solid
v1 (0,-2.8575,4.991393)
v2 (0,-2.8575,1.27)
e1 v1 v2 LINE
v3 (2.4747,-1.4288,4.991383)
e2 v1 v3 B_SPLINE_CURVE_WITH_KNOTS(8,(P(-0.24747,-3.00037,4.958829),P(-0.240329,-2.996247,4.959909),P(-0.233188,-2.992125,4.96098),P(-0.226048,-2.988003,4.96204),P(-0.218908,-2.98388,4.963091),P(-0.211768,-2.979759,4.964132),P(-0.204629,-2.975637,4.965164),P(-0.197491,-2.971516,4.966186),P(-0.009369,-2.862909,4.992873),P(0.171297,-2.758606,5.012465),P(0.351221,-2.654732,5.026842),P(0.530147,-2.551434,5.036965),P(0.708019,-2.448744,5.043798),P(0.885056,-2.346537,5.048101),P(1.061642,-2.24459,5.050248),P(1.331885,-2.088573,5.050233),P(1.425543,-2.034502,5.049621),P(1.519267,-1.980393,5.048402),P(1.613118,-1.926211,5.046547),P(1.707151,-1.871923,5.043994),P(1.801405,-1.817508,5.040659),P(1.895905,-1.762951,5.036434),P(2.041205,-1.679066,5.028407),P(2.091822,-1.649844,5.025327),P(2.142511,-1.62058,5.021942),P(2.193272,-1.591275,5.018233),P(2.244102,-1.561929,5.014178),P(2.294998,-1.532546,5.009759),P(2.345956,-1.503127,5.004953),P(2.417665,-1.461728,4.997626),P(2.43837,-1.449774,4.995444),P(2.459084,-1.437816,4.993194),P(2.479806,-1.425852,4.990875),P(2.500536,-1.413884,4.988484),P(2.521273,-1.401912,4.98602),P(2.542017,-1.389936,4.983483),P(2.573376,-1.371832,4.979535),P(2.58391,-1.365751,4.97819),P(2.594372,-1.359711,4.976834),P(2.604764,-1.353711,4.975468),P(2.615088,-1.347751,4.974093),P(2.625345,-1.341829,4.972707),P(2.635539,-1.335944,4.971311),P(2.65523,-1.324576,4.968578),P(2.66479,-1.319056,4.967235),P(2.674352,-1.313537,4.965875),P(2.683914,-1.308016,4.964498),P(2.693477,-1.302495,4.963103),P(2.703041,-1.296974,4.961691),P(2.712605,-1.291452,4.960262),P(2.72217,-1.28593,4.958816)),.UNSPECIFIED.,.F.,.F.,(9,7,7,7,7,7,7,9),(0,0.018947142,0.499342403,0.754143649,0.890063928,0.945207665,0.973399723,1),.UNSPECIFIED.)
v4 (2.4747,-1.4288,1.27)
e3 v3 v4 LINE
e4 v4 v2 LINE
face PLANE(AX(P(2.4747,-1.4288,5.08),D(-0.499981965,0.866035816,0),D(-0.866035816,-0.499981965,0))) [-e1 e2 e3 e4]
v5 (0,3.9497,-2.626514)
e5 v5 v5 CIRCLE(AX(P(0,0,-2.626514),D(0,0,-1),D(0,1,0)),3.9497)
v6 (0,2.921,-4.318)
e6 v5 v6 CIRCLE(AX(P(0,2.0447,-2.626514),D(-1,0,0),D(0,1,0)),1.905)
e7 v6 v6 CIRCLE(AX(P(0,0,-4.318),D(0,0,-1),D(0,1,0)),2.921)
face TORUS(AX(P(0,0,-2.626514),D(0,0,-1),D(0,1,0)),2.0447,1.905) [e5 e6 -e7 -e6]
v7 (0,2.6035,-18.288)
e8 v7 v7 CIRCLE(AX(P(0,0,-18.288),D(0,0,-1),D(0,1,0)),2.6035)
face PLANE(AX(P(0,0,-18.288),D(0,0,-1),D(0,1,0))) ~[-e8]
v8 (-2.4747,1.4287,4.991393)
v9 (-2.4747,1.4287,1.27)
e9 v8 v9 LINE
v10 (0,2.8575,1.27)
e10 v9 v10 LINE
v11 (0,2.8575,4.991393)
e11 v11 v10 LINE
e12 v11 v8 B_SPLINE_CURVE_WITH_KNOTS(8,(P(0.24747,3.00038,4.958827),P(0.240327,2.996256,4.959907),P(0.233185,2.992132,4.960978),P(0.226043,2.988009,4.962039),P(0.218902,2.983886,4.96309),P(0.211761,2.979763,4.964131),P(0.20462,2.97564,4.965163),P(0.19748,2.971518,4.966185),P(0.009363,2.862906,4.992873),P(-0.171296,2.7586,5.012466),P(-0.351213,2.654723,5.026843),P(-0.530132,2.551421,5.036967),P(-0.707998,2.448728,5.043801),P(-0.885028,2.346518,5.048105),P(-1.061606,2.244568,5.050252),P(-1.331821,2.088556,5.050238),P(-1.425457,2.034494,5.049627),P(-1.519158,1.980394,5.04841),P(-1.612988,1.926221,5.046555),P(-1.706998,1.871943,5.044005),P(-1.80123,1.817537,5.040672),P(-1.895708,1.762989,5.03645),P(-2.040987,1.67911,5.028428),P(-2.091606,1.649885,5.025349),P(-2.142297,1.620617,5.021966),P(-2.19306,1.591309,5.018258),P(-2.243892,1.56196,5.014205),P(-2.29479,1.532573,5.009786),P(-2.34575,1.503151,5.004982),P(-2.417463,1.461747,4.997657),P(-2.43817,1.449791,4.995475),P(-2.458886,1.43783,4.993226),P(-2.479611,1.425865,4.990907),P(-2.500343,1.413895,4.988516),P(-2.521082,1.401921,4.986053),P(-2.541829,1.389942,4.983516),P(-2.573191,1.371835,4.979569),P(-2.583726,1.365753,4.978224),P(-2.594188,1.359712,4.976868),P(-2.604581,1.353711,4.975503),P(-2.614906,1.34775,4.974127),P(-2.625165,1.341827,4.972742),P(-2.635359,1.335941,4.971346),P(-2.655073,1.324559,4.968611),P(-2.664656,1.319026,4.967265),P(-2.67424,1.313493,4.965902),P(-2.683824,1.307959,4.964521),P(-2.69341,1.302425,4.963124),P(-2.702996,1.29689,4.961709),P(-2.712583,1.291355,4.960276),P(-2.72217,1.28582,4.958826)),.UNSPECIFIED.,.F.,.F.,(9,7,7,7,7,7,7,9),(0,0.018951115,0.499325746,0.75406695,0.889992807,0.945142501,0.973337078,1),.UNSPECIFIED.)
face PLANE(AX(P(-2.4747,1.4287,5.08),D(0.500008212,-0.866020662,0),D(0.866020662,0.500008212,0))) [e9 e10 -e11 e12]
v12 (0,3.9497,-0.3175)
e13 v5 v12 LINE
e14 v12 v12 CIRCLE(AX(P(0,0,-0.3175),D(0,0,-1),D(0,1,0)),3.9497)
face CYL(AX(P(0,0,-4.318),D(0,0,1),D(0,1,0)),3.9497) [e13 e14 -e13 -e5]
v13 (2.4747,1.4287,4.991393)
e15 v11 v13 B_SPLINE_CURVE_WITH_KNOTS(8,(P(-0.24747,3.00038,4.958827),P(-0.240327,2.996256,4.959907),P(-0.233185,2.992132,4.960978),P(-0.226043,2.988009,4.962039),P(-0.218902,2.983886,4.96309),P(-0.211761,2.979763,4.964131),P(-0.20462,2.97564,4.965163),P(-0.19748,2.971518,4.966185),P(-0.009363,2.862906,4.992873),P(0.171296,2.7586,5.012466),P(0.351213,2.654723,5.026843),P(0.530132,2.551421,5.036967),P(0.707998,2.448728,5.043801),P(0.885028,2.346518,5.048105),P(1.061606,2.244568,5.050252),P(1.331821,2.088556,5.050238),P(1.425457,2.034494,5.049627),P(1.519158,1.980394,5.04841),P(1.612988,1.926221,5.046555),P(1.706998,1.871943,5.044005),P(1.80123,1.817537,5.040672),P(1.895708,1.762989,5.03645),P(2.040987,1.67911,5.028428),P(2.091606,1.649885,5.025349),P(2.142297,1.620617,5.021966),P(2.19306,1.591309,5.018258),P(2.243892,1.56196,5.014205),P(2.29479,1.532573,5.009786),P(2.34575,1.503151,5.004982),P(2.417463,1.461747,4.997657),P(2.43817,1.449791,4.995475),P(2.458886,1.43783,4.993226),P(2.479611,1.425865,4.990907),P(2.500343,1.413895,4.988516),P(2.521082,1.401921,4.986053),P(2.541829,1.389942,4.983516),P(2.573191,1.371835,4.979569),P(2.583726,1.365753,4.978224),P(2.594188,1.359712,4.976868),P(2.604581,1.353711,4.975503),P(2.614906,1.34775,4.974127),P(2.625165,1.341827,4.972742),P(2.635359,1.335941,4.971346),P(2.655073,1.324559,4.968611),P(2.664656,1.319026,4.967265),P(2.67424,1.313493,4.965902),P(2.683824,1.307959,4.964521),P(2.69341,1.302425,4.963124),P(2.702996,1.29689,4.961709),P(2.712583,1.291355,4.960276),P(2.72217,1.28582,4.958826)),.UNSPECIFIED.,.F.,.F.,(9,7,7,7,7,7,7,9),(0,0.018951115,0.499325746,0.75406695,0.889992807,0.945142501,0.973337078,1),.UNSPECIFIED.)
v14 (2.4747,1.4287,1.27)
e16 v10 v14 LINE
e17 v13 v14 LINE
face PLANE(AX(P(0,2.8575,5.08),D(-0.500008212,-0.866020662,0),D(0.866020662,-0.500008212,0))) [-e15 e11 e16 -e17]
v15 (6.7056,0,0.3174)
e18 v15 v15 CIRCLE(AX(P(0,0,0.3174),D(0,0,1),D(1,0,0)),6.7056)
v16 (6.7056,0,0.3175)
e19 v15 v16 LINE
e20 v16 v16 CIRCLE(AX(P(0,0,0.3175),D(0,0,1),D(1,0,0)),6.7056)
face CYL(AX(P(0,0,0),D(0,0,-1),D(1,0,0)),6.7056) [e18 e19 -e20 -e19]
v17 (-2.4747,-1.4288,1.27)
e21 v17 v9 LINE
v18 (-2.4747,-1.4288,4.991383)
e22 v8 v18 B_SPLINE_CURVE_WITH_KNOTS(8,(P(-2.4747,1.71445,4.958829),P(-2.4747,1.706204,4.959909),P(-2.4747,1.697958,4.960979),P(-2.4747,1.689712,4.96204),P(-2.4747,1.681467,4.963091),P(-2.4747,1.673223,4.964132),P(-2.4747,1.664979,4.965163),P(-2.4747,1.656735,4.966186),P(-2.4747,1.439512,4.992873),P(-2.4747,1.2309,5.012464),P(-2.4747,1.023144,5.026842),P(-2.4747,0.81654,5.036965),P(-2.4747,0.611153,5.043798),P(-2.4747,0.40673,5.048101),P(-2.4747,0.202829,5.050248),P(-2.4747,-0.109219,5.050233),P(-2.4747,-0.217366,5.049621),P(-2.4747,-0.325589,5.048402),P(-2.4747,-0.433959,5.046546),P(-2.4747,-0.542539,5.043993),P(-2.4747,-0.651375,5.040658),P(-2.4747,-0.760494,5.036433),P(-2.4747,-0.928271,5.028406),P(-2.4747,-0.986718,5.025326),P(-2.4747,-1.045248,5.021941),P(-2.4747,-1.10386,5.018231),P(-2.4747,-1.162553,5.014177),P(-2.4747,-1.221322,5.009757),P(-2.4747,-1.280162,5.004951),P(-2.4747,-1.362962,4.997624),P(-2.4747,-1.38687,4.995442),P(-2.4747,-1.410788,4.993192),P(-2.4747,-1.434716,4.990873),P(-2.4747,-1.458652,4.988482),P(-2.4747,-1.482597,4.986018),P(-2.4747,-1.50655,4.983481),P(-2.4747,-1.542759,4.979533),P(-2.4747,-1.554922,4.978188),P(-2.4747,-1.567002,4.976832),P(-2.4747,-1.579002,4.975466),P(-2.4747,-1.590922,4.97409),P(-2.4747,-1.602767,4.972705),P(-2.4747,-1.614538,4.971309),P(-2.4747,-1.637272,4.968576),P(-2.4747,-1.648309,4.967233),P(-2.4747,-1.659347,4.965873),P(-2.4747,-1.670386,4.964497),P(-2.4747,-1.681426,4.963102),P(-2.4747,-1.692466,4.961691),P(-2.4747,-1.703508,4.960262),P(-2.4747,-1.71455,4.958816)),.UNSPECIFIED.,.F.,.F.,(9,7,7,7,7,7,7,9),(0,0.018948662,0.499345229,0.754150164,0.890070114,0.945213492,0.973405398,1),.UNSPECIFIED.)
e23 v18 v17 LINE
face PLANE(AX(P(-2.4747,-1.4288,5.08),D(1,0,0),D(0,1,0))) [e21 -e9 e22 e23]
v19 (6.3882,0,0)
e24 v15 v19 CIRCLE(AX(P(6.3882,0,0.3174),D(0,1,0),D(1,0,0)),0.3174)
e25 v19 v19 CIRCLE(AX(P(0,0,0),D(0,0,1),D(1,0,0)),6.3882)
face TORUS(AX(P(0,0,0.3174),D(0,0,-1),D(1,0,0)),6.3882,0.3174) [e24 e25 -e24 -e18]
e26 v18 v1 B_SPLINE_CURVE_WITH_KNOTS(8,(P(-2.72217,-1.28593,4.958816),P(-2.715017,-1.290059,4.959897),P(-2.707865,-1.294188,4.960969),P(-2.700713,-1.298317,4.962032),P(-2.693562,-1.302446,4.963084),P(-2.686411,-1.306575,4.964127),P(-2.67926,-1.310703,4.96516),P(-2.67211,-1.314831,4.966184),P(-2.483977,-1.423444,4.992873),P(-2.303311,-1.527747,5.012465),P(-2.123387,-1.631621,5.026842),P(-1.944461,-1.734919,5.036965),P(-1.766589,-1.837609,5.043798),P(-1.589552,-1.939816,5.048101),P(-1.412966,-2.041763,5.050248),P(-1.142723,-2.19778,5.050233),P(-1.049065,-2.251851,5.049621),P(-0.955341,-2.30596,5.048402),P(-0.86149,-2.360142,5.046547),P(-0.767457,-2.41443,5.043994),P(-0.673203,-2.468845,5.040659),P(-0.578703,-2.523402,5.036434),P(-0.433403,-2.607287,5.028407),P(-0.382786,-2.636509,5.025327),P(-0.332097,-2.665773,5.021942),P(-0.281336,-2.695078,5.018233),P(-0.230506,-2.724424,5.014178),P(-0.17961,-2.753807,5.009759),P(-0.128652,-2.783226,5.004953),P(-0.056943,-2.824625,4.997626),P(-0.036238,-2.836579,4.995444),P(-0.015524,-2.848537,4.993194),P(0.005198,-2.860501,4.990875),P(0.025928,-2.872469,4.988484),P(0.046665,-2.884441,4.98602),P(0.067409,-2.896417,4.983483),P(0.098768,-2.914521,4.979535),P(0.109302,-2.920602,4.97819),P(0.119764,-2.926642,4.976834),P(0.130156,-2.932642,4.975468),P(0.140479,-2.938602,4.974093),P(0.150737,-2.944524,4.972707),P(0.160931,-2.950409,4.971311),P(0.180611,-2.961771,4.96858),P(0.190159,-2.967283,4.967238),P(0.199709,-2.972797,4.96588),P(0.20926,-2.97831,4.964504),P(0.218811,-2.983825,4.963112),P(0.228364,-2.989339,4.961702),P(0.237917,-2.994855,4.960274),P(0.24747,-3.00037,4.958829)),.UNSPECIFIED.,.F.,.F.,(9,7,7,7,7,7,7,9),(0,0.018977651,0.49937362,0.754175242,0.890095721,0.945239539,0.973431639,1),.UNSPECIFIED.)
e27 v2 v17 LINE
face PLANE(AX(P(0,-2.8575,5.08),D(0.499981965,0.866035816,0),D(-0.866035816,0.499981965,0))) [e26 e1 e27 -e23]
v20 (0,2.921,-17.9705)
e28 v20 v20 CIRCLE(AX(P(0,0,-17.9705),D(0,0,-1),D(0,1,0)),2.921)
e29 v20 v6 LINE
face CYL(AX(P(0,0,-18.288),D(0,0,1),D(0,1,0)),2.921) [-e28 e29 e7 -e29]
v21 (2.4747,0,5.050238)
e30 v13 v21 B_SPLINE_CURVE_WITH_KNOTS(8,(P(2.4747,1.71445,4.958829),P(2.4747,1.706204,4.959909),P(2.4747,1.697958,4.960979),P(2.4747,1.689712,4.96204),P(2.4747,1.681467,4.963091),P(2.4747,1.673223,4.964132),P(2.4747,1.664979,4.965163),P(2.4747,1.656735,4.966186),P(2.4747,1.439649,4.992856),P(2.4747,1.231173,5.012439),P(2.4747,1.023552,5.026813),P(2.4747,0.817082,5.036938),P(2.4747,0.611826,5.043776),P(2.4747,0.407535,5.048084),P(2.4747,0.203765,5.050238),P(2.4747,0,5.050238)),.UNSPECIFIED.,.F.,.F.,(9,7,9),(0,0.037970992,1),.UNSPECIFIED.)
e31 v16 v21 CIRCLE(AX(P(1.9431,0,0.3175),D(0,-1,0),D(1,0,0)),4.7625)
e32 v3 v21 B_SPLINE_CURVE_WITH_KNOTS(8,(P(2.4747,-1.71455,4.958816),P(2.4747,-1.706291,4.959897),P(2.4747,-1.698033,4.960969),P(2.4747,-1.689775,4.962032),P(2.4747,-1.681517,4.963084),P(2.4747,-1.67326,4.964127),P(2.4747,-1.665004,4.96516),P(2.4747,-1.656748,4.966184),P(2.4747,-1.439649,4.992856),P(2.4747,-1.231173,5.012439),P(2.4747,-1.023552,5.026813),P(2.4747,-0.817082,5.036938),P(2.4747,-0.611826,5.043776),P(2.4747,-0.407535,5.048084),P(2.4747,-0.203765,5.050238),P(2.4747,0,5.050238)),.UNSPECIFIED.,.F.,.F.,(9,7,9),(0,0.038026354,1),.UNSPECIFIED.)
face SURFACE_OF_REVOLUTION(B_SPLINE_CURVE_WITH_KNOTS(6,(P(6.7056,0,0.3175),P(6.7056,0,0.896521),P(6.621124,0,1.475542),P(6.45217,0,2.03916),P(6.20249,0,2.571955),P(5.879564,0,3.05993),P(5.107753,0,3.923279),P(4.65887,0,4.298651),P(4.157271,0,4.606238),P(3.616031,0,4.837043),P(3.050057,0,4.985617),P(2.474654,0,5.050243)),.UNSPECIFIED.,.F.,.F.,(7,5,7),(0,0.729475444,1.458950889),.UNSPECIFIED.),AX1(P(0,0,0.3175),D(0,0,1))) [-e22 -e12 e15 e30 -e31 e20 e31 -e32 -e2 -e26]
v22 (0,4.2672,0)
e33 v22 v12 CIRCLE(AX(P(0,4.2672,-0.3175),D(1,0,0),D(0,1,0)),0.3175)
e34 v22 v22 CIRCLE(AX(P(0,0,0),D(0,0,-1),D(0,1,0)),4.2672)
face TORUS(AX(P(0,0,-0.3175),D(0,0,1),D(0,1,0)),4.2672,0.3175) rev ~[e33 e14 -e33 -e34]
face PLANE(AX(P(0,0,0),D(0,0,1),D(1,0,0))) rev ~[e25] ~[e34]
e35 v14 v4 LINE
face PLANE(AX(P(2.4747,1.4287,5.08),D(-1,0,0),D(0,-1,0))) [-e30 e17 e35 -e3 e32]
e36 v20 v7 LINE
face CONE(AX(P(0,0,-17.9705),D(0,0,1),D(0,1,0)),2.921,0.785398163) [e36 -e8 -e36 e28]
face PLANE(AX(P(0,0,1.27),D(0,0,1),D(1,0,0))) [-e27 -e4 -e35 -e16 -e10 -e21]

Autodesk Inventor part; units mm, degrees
ref_plane "YZ Plane" through (0, 0, 0) normal (1, 0, 0) x (0, 1, 0)
ref_plane "XZ Plane" through (0, 0, 0) normal (0, 1, 0) x (-1, 0, 0)
ref_plane "XY Plane" through (0, 0, 0) normal (0, 0, 1) x (1, 0, 0)
sketch "Sketch1" plane through (0, 0, 0) normal (0, 0, 1) x (1, 0, 0)
  circle A0 centre (0, 0) radius 6.7056
  dimension "d0" = 13.4112
extrude "Extrusion1" add sketch "Sketch1" along normal blind 5.08
fillet "Fillet1" radius 4.7625 1 edges at (-6.7056, 0, 5.08)
fillet "Fillet2" radius 0.3175 1 edges at (-6.7056, 0, 0)
sketch "Sketch2" plane through (0, 0, 5.08) normal (0, 0, 1) x (1, 0, 0)
  line L0 (0, -2.8575) -> (-2.4747, -1.4288)
  line L1 (-2.4747, -1.4288) -> (-2.4747, 1.4287)
  line L2 (-2.4747, 1.4287) -> (0, 2.8575)
  line L3 (0, 2.8575) -> (2.4747, 1.4287)
  line L4 (2.4747, 1.4287) -> (2.4747, -1.4288)
  line L5 (2.4747, -1.4288) -> (0, -2.8575)
  point P0 (0, 0)
  point P1 (0, 0)
  dimension "d5" = 5.715
extrude "Extrusion2" cut sketch "Sketch2" against normal blind 3.81
sketch "Sketch3" plane through (0, 0, 0) normal (1, 0, 0) x (0, 1, 0)
  line L0 (0, 0) -> (0, -18.288)
  line L1 (0, -18.288) -> (2.921, -18.288)
  line L2 (2.921, -18.288) -> (2.921, -4.318)
  line L3 (2.921, -4.318) -> (3.9497, -4.318)
  line L4 (3.9497, -4.318) -> (3.9497, 0)
  line L5 (6.3881, 0) -> (-6.3881, 0) projected
  dimension "d8" = 2.921
  dimension "d9" = 13.97
  dimension "d10" = 18.288
  dimension "d11" = 3.9497
revolve "Revolution1" add sketch "Sketch3" angle 360 about axis through (0, 0, 0) along (0, 0, -1)
fillet "Fillet3" radius 1.905 1 edges at (0, -3.9497, -4.318)
fillet "Fillet4" radius 0.3175 1 edges at (0, -3.9497, 0)
thread "Thread1" size "1/4-28 UNF" class "2A" standard "ANSI Unified Screw Threads" full length
chamfer "Chamfer1" distance 0.3175 angle 45 1 edges at (0, -2.921, -18.288)
properties part number "Axel-Male" material "Stainless Steel"
